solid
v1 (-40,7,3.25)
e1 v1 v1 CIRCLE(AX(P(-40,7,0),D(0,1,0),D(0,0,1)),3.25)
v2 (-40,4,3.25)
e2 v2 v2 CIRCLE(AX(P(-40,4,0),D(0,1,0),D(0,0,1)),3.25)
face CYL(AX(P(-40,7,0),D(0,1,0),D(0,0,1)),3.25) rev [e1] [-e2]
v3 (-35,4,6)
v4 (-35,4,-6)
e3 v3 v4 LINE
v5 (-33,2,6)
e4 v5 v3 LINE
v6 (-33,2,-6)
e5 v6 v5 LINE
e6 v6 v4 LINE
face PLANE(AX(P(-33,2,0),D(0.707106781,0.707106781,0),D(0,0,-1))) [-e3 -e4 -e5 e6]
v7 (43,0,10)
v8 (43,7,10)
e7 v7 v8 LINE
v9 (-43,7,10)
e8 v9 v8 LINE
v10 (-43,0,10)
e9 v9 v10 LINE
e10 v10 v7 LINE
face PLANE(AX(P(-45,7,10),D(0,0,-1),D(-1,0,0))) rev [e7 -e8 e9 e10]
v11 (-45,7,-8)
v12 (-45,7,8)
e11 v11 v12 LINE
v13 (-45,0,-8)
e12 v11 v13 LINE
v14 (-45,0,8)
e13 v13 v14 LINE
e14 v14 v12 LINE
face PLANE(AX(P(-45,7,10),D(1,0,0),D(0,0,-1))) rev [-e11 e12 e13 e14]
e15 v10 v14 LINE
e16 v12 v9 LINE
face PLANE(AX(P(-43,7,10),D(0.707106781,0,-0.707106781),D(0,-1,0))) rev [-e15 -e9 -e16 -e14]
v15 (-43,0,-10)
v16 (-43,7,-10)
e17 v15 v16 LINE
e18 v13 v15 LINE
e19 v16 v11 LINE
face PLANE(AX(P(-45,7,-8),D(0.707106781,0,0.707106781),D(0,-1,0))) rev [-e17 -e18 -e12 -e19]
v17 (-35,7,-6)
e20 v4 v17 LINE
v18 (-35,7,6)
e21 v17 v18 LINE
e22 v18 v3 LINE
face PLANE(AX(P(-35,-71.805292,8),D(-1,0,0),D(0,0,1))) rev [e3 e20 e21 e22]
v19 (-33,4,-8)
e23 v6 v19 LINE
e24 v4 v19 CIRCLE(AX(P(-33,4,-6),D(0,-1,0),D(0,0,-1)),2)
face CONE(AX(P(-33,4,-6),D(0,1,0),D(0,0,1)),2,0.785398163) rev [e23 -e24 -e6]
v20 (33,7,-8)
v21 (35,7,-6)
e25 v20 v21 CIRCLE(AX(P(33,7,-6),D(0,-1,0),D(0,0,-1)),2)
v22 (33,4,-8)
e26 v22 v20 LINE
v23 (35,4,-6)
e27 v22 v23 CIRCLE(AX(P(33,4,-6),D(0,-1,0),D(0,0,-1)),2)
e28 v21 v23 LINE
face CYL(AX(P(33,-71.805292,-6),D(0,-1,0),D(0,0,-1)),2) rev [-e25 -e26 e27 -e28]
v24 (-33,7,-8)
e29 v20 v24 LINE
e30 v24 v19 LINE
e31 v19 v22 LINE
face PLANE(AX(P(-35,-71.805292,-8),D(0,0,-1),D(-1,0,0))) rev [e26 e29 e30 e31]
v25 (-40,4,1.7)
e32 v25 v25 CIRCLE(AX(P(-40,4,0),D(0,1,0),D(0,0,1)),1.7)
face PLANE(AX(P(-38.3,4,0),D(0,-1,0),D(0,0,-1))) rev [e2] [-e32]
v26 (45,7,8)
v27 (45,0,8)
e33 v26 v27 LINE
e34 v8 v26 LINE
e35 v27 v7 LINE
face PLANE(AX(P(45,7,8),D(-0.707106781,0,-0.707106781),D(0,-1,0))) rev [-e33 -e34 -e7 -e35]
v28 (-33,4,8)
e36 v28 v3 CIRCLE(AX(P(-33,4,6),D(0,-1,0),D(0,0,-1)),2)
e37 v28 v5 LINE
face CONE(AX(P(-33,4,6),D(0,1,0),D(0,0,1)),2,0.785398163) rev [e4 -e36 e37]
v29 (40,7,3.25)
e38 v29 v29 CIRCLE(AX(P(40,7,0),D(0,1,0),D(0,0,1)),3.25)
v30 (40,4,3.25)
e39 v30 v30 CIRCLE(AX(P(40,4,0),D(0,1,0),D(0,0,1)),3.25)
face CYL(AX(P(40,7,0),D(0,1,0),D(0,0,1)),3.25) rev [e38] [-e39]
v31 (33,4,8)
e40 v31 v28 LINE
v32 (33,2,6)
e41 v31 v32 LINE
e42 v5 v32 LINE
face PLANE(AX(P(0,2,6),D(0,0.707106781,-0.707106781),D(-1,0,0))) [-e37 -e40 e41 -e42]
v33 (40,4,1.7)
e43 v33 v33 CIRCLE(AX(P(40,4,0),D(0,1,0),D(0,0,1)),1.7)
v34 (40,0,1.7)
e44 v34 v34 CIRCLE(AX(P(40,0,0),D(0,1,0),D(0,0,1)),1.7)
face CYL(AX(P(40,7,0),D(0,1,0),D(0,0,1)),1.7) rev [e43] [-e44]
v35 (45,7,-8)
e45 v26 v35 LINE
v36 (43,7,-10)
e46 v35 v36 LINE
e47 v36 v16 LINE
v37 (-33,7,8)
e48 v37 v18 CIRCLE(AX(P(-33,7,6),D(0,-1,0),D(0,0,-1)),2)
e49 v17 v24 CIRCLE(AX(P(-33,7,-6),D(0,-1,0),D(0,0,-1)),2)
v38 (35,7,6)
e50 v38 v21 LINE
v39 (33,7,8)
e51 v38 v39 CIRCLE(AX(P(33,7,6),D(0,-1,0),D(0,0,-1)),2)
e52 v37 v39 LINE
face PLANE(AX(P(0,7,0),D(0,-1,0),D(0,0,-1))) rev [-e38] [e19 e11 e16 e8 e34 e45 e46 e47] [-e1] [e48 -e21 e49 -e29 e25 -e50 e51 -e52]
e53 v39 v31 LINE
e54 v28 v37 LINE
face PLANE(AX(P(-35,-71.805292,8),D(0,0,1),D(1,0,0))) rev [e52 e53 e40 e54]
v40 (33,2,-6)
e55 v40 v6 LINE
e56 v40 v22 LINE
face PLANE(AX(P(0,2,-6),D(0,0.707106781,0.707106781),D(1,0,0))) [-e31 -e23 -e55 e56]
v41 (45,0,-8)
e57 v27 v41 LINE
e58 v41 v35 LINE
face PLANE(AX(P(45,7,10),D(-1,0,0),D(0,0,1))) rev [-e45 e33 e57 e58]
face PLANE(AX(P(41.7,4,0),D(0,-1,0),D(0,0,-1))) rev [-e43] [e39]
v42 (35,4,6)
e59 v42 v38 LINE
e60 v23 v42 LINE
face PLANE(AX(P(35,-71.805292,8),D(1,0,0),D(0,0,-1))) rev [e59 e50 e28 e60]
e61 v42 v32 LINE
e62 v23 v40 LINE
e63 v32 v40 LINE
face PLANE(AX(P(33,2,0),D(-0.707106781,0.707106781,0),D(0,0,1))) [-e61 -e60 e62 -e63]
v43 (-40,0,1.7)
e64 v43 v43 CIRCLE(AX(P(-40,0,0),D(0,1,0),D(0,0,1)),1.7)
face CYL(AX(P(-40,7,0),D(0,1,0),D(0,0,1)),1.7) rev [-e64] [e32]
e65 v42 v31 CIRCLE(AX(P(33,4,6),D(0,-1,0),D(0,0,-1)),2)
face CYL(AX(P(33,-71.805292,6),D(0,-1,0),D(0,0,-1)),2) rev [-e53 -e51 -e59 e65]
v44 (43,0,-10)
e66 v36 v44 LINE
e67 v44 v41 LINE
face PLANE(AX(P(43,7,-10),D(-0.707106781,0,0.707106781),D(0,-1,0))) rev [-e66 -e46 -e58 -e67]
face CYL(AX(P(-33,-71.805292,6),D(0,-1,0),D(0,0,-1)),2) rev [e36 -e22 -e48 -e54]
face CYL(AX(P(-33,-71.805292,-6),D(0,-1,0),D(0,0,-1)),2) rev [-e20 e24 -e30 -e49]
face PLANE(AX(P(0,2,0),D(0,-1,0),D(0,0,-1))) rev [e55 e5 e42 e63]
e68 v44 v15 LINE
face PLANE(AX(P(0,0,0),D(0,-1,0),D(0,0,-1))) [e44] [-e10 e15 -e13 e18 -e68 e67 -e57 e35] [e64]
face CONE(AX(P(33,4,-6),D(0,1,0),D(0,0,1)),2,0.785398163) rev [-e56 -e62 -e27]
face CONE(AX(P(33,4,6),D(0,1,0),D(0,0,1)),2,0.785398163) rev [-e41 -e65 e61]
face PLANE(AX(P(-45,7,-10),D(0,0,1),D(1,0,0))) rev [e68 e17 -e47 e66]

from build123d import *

# Parameters (mm, degrees)
SKETCH1_W                      = 90
SKETCH1_H                      = 20
BOSS_EXTRUDE1_DEPTH            = 7
CBORE_START                    = 4
CBORE_FOR_M3_SHCS1_OUTLINE_R   = 3.25
CBORE_FOR_M3_SHCS1_DEPTH       = 3
CBORE_FOR_M3_SHCS1_2_OUTLINE_R = 1.7
CBORE_FOR_M3_SHCS1_2_DEPTH     = 4
SKETCH4_W                      = 70
SKETCH4_H                      = 16
CUT_EXTRUDE1_DEPTH             = 5
CHAMFER1_SIZE                  = 2
FILLET1_R                      = 2
CHAMFER2_SIZE                  = 2


# Read off the part's stored shape, not the designer's step: CBORE for M3 SHCS1
with BuildPart() as part:
    # Sketch1 → Boss-Extrude1 (new body)
    with BuildSketch(Plane(origin=(0, 0, 0), x_dir=(1, 0, 0), z_dir=(0, 1, 0))):
        Rectangle(SKETCH1_W, SKETCH1_H)
    extrude(amount=BOSS_EXTRUDE1_DEPTH)

    # CBORE for M3 SHCS1 outline → CBORE for M3 SHCS1 (cut)
    with BuildSketch(Plane(origin=(0, 0, 0), x_dir=(1, 0, 0), z_dir=(0, 1, 0)).offset(CBORE_START)):
        with Locations((-40, 0)):
            Circle(CBORE_FOR_M3_SHCS1_OUTLINE_R)
        with Locations((40, 0)):
            Circle(CBORE_FOR_M3_SHCS1_OUTLINE_R)
    extrude(amount=CBORE_FOR_M3_SHCS1_DEPTH, mode=Mode.SUBTRACT)

    # CBORE for M3 SHCS1 2 outline → CBORE for M3 SHCS1 2 (cut)
    with BuildSketch(Plane(origin=(0, 0, 0), x_dir=(1, 0, 0), z_dir=(0, 1, 0))):
        with Locations((-40, 0)):
            Circle(CBORE_FOR_M3_SHCS1_2_OUTLINE_R)
        with Locations((40, 0)):
            Circle(CBORE_FOR_M3_SHCS1_2_OUTLINE_R)
    extrude(amount=CBORE_FOR_M3_SHCS1_2_DEPTH, mode=Mode.SUBTRACT)

    # Sketch4 → Cut-Extrude1 (cut)
    with BuildSketch(Plane(origin=(0, 7, 0), x_dir=(1, 0, 0), z_dir=(0, 1, 0))):
        Rectangle(SKETCH4_W, SKETCH4_H)
    extrude(amount=-CUT_EXTRUDE1_DEPTH, mode=Mode.SUBTRACT)

    # Chamfer1
    chamfer1_edges = [part.edges().sort_by_distance(p)[0] for p in [
        (45, 3.5, 10),
        (-45, 3.5, 10),
        (-45, 3.5, -10),
        (45, 3.5, -10),
    ]]
    chamfer(chamfer1_edges, length=CHAMFER1_SIZE)

    # Fillet1
    fillet1_edges = [part.edges().sort_by_distance(p)[0] for p in [
        (-35, 4.5, -8),
        (-35, 4.5, 8),
        (35, 4.5, 8),
        (35, 4.5, -8),
    ]]
    fillet(fillet1_edges, radius=FILLET1_R)

    # Chamfer2
    chamfer2_edges = [part.edges().sort_by_distance(p)[0] for p in [
        (35, 2, 0),
        (0, 2, 8),
        (0, 2, -8),
        (-35, 2, 0),
        (-34.414213562, 2, 7.414213562),
        (-34.414213562, 2, -7.414213562),
        (34.414213562, 2, -7.414213562),
        (34.414213562, 2, 7.414213562),
    ]]
    chamfer(chamfer2_edges, length=CHAMFER2_SIZE)


solid = part.part
